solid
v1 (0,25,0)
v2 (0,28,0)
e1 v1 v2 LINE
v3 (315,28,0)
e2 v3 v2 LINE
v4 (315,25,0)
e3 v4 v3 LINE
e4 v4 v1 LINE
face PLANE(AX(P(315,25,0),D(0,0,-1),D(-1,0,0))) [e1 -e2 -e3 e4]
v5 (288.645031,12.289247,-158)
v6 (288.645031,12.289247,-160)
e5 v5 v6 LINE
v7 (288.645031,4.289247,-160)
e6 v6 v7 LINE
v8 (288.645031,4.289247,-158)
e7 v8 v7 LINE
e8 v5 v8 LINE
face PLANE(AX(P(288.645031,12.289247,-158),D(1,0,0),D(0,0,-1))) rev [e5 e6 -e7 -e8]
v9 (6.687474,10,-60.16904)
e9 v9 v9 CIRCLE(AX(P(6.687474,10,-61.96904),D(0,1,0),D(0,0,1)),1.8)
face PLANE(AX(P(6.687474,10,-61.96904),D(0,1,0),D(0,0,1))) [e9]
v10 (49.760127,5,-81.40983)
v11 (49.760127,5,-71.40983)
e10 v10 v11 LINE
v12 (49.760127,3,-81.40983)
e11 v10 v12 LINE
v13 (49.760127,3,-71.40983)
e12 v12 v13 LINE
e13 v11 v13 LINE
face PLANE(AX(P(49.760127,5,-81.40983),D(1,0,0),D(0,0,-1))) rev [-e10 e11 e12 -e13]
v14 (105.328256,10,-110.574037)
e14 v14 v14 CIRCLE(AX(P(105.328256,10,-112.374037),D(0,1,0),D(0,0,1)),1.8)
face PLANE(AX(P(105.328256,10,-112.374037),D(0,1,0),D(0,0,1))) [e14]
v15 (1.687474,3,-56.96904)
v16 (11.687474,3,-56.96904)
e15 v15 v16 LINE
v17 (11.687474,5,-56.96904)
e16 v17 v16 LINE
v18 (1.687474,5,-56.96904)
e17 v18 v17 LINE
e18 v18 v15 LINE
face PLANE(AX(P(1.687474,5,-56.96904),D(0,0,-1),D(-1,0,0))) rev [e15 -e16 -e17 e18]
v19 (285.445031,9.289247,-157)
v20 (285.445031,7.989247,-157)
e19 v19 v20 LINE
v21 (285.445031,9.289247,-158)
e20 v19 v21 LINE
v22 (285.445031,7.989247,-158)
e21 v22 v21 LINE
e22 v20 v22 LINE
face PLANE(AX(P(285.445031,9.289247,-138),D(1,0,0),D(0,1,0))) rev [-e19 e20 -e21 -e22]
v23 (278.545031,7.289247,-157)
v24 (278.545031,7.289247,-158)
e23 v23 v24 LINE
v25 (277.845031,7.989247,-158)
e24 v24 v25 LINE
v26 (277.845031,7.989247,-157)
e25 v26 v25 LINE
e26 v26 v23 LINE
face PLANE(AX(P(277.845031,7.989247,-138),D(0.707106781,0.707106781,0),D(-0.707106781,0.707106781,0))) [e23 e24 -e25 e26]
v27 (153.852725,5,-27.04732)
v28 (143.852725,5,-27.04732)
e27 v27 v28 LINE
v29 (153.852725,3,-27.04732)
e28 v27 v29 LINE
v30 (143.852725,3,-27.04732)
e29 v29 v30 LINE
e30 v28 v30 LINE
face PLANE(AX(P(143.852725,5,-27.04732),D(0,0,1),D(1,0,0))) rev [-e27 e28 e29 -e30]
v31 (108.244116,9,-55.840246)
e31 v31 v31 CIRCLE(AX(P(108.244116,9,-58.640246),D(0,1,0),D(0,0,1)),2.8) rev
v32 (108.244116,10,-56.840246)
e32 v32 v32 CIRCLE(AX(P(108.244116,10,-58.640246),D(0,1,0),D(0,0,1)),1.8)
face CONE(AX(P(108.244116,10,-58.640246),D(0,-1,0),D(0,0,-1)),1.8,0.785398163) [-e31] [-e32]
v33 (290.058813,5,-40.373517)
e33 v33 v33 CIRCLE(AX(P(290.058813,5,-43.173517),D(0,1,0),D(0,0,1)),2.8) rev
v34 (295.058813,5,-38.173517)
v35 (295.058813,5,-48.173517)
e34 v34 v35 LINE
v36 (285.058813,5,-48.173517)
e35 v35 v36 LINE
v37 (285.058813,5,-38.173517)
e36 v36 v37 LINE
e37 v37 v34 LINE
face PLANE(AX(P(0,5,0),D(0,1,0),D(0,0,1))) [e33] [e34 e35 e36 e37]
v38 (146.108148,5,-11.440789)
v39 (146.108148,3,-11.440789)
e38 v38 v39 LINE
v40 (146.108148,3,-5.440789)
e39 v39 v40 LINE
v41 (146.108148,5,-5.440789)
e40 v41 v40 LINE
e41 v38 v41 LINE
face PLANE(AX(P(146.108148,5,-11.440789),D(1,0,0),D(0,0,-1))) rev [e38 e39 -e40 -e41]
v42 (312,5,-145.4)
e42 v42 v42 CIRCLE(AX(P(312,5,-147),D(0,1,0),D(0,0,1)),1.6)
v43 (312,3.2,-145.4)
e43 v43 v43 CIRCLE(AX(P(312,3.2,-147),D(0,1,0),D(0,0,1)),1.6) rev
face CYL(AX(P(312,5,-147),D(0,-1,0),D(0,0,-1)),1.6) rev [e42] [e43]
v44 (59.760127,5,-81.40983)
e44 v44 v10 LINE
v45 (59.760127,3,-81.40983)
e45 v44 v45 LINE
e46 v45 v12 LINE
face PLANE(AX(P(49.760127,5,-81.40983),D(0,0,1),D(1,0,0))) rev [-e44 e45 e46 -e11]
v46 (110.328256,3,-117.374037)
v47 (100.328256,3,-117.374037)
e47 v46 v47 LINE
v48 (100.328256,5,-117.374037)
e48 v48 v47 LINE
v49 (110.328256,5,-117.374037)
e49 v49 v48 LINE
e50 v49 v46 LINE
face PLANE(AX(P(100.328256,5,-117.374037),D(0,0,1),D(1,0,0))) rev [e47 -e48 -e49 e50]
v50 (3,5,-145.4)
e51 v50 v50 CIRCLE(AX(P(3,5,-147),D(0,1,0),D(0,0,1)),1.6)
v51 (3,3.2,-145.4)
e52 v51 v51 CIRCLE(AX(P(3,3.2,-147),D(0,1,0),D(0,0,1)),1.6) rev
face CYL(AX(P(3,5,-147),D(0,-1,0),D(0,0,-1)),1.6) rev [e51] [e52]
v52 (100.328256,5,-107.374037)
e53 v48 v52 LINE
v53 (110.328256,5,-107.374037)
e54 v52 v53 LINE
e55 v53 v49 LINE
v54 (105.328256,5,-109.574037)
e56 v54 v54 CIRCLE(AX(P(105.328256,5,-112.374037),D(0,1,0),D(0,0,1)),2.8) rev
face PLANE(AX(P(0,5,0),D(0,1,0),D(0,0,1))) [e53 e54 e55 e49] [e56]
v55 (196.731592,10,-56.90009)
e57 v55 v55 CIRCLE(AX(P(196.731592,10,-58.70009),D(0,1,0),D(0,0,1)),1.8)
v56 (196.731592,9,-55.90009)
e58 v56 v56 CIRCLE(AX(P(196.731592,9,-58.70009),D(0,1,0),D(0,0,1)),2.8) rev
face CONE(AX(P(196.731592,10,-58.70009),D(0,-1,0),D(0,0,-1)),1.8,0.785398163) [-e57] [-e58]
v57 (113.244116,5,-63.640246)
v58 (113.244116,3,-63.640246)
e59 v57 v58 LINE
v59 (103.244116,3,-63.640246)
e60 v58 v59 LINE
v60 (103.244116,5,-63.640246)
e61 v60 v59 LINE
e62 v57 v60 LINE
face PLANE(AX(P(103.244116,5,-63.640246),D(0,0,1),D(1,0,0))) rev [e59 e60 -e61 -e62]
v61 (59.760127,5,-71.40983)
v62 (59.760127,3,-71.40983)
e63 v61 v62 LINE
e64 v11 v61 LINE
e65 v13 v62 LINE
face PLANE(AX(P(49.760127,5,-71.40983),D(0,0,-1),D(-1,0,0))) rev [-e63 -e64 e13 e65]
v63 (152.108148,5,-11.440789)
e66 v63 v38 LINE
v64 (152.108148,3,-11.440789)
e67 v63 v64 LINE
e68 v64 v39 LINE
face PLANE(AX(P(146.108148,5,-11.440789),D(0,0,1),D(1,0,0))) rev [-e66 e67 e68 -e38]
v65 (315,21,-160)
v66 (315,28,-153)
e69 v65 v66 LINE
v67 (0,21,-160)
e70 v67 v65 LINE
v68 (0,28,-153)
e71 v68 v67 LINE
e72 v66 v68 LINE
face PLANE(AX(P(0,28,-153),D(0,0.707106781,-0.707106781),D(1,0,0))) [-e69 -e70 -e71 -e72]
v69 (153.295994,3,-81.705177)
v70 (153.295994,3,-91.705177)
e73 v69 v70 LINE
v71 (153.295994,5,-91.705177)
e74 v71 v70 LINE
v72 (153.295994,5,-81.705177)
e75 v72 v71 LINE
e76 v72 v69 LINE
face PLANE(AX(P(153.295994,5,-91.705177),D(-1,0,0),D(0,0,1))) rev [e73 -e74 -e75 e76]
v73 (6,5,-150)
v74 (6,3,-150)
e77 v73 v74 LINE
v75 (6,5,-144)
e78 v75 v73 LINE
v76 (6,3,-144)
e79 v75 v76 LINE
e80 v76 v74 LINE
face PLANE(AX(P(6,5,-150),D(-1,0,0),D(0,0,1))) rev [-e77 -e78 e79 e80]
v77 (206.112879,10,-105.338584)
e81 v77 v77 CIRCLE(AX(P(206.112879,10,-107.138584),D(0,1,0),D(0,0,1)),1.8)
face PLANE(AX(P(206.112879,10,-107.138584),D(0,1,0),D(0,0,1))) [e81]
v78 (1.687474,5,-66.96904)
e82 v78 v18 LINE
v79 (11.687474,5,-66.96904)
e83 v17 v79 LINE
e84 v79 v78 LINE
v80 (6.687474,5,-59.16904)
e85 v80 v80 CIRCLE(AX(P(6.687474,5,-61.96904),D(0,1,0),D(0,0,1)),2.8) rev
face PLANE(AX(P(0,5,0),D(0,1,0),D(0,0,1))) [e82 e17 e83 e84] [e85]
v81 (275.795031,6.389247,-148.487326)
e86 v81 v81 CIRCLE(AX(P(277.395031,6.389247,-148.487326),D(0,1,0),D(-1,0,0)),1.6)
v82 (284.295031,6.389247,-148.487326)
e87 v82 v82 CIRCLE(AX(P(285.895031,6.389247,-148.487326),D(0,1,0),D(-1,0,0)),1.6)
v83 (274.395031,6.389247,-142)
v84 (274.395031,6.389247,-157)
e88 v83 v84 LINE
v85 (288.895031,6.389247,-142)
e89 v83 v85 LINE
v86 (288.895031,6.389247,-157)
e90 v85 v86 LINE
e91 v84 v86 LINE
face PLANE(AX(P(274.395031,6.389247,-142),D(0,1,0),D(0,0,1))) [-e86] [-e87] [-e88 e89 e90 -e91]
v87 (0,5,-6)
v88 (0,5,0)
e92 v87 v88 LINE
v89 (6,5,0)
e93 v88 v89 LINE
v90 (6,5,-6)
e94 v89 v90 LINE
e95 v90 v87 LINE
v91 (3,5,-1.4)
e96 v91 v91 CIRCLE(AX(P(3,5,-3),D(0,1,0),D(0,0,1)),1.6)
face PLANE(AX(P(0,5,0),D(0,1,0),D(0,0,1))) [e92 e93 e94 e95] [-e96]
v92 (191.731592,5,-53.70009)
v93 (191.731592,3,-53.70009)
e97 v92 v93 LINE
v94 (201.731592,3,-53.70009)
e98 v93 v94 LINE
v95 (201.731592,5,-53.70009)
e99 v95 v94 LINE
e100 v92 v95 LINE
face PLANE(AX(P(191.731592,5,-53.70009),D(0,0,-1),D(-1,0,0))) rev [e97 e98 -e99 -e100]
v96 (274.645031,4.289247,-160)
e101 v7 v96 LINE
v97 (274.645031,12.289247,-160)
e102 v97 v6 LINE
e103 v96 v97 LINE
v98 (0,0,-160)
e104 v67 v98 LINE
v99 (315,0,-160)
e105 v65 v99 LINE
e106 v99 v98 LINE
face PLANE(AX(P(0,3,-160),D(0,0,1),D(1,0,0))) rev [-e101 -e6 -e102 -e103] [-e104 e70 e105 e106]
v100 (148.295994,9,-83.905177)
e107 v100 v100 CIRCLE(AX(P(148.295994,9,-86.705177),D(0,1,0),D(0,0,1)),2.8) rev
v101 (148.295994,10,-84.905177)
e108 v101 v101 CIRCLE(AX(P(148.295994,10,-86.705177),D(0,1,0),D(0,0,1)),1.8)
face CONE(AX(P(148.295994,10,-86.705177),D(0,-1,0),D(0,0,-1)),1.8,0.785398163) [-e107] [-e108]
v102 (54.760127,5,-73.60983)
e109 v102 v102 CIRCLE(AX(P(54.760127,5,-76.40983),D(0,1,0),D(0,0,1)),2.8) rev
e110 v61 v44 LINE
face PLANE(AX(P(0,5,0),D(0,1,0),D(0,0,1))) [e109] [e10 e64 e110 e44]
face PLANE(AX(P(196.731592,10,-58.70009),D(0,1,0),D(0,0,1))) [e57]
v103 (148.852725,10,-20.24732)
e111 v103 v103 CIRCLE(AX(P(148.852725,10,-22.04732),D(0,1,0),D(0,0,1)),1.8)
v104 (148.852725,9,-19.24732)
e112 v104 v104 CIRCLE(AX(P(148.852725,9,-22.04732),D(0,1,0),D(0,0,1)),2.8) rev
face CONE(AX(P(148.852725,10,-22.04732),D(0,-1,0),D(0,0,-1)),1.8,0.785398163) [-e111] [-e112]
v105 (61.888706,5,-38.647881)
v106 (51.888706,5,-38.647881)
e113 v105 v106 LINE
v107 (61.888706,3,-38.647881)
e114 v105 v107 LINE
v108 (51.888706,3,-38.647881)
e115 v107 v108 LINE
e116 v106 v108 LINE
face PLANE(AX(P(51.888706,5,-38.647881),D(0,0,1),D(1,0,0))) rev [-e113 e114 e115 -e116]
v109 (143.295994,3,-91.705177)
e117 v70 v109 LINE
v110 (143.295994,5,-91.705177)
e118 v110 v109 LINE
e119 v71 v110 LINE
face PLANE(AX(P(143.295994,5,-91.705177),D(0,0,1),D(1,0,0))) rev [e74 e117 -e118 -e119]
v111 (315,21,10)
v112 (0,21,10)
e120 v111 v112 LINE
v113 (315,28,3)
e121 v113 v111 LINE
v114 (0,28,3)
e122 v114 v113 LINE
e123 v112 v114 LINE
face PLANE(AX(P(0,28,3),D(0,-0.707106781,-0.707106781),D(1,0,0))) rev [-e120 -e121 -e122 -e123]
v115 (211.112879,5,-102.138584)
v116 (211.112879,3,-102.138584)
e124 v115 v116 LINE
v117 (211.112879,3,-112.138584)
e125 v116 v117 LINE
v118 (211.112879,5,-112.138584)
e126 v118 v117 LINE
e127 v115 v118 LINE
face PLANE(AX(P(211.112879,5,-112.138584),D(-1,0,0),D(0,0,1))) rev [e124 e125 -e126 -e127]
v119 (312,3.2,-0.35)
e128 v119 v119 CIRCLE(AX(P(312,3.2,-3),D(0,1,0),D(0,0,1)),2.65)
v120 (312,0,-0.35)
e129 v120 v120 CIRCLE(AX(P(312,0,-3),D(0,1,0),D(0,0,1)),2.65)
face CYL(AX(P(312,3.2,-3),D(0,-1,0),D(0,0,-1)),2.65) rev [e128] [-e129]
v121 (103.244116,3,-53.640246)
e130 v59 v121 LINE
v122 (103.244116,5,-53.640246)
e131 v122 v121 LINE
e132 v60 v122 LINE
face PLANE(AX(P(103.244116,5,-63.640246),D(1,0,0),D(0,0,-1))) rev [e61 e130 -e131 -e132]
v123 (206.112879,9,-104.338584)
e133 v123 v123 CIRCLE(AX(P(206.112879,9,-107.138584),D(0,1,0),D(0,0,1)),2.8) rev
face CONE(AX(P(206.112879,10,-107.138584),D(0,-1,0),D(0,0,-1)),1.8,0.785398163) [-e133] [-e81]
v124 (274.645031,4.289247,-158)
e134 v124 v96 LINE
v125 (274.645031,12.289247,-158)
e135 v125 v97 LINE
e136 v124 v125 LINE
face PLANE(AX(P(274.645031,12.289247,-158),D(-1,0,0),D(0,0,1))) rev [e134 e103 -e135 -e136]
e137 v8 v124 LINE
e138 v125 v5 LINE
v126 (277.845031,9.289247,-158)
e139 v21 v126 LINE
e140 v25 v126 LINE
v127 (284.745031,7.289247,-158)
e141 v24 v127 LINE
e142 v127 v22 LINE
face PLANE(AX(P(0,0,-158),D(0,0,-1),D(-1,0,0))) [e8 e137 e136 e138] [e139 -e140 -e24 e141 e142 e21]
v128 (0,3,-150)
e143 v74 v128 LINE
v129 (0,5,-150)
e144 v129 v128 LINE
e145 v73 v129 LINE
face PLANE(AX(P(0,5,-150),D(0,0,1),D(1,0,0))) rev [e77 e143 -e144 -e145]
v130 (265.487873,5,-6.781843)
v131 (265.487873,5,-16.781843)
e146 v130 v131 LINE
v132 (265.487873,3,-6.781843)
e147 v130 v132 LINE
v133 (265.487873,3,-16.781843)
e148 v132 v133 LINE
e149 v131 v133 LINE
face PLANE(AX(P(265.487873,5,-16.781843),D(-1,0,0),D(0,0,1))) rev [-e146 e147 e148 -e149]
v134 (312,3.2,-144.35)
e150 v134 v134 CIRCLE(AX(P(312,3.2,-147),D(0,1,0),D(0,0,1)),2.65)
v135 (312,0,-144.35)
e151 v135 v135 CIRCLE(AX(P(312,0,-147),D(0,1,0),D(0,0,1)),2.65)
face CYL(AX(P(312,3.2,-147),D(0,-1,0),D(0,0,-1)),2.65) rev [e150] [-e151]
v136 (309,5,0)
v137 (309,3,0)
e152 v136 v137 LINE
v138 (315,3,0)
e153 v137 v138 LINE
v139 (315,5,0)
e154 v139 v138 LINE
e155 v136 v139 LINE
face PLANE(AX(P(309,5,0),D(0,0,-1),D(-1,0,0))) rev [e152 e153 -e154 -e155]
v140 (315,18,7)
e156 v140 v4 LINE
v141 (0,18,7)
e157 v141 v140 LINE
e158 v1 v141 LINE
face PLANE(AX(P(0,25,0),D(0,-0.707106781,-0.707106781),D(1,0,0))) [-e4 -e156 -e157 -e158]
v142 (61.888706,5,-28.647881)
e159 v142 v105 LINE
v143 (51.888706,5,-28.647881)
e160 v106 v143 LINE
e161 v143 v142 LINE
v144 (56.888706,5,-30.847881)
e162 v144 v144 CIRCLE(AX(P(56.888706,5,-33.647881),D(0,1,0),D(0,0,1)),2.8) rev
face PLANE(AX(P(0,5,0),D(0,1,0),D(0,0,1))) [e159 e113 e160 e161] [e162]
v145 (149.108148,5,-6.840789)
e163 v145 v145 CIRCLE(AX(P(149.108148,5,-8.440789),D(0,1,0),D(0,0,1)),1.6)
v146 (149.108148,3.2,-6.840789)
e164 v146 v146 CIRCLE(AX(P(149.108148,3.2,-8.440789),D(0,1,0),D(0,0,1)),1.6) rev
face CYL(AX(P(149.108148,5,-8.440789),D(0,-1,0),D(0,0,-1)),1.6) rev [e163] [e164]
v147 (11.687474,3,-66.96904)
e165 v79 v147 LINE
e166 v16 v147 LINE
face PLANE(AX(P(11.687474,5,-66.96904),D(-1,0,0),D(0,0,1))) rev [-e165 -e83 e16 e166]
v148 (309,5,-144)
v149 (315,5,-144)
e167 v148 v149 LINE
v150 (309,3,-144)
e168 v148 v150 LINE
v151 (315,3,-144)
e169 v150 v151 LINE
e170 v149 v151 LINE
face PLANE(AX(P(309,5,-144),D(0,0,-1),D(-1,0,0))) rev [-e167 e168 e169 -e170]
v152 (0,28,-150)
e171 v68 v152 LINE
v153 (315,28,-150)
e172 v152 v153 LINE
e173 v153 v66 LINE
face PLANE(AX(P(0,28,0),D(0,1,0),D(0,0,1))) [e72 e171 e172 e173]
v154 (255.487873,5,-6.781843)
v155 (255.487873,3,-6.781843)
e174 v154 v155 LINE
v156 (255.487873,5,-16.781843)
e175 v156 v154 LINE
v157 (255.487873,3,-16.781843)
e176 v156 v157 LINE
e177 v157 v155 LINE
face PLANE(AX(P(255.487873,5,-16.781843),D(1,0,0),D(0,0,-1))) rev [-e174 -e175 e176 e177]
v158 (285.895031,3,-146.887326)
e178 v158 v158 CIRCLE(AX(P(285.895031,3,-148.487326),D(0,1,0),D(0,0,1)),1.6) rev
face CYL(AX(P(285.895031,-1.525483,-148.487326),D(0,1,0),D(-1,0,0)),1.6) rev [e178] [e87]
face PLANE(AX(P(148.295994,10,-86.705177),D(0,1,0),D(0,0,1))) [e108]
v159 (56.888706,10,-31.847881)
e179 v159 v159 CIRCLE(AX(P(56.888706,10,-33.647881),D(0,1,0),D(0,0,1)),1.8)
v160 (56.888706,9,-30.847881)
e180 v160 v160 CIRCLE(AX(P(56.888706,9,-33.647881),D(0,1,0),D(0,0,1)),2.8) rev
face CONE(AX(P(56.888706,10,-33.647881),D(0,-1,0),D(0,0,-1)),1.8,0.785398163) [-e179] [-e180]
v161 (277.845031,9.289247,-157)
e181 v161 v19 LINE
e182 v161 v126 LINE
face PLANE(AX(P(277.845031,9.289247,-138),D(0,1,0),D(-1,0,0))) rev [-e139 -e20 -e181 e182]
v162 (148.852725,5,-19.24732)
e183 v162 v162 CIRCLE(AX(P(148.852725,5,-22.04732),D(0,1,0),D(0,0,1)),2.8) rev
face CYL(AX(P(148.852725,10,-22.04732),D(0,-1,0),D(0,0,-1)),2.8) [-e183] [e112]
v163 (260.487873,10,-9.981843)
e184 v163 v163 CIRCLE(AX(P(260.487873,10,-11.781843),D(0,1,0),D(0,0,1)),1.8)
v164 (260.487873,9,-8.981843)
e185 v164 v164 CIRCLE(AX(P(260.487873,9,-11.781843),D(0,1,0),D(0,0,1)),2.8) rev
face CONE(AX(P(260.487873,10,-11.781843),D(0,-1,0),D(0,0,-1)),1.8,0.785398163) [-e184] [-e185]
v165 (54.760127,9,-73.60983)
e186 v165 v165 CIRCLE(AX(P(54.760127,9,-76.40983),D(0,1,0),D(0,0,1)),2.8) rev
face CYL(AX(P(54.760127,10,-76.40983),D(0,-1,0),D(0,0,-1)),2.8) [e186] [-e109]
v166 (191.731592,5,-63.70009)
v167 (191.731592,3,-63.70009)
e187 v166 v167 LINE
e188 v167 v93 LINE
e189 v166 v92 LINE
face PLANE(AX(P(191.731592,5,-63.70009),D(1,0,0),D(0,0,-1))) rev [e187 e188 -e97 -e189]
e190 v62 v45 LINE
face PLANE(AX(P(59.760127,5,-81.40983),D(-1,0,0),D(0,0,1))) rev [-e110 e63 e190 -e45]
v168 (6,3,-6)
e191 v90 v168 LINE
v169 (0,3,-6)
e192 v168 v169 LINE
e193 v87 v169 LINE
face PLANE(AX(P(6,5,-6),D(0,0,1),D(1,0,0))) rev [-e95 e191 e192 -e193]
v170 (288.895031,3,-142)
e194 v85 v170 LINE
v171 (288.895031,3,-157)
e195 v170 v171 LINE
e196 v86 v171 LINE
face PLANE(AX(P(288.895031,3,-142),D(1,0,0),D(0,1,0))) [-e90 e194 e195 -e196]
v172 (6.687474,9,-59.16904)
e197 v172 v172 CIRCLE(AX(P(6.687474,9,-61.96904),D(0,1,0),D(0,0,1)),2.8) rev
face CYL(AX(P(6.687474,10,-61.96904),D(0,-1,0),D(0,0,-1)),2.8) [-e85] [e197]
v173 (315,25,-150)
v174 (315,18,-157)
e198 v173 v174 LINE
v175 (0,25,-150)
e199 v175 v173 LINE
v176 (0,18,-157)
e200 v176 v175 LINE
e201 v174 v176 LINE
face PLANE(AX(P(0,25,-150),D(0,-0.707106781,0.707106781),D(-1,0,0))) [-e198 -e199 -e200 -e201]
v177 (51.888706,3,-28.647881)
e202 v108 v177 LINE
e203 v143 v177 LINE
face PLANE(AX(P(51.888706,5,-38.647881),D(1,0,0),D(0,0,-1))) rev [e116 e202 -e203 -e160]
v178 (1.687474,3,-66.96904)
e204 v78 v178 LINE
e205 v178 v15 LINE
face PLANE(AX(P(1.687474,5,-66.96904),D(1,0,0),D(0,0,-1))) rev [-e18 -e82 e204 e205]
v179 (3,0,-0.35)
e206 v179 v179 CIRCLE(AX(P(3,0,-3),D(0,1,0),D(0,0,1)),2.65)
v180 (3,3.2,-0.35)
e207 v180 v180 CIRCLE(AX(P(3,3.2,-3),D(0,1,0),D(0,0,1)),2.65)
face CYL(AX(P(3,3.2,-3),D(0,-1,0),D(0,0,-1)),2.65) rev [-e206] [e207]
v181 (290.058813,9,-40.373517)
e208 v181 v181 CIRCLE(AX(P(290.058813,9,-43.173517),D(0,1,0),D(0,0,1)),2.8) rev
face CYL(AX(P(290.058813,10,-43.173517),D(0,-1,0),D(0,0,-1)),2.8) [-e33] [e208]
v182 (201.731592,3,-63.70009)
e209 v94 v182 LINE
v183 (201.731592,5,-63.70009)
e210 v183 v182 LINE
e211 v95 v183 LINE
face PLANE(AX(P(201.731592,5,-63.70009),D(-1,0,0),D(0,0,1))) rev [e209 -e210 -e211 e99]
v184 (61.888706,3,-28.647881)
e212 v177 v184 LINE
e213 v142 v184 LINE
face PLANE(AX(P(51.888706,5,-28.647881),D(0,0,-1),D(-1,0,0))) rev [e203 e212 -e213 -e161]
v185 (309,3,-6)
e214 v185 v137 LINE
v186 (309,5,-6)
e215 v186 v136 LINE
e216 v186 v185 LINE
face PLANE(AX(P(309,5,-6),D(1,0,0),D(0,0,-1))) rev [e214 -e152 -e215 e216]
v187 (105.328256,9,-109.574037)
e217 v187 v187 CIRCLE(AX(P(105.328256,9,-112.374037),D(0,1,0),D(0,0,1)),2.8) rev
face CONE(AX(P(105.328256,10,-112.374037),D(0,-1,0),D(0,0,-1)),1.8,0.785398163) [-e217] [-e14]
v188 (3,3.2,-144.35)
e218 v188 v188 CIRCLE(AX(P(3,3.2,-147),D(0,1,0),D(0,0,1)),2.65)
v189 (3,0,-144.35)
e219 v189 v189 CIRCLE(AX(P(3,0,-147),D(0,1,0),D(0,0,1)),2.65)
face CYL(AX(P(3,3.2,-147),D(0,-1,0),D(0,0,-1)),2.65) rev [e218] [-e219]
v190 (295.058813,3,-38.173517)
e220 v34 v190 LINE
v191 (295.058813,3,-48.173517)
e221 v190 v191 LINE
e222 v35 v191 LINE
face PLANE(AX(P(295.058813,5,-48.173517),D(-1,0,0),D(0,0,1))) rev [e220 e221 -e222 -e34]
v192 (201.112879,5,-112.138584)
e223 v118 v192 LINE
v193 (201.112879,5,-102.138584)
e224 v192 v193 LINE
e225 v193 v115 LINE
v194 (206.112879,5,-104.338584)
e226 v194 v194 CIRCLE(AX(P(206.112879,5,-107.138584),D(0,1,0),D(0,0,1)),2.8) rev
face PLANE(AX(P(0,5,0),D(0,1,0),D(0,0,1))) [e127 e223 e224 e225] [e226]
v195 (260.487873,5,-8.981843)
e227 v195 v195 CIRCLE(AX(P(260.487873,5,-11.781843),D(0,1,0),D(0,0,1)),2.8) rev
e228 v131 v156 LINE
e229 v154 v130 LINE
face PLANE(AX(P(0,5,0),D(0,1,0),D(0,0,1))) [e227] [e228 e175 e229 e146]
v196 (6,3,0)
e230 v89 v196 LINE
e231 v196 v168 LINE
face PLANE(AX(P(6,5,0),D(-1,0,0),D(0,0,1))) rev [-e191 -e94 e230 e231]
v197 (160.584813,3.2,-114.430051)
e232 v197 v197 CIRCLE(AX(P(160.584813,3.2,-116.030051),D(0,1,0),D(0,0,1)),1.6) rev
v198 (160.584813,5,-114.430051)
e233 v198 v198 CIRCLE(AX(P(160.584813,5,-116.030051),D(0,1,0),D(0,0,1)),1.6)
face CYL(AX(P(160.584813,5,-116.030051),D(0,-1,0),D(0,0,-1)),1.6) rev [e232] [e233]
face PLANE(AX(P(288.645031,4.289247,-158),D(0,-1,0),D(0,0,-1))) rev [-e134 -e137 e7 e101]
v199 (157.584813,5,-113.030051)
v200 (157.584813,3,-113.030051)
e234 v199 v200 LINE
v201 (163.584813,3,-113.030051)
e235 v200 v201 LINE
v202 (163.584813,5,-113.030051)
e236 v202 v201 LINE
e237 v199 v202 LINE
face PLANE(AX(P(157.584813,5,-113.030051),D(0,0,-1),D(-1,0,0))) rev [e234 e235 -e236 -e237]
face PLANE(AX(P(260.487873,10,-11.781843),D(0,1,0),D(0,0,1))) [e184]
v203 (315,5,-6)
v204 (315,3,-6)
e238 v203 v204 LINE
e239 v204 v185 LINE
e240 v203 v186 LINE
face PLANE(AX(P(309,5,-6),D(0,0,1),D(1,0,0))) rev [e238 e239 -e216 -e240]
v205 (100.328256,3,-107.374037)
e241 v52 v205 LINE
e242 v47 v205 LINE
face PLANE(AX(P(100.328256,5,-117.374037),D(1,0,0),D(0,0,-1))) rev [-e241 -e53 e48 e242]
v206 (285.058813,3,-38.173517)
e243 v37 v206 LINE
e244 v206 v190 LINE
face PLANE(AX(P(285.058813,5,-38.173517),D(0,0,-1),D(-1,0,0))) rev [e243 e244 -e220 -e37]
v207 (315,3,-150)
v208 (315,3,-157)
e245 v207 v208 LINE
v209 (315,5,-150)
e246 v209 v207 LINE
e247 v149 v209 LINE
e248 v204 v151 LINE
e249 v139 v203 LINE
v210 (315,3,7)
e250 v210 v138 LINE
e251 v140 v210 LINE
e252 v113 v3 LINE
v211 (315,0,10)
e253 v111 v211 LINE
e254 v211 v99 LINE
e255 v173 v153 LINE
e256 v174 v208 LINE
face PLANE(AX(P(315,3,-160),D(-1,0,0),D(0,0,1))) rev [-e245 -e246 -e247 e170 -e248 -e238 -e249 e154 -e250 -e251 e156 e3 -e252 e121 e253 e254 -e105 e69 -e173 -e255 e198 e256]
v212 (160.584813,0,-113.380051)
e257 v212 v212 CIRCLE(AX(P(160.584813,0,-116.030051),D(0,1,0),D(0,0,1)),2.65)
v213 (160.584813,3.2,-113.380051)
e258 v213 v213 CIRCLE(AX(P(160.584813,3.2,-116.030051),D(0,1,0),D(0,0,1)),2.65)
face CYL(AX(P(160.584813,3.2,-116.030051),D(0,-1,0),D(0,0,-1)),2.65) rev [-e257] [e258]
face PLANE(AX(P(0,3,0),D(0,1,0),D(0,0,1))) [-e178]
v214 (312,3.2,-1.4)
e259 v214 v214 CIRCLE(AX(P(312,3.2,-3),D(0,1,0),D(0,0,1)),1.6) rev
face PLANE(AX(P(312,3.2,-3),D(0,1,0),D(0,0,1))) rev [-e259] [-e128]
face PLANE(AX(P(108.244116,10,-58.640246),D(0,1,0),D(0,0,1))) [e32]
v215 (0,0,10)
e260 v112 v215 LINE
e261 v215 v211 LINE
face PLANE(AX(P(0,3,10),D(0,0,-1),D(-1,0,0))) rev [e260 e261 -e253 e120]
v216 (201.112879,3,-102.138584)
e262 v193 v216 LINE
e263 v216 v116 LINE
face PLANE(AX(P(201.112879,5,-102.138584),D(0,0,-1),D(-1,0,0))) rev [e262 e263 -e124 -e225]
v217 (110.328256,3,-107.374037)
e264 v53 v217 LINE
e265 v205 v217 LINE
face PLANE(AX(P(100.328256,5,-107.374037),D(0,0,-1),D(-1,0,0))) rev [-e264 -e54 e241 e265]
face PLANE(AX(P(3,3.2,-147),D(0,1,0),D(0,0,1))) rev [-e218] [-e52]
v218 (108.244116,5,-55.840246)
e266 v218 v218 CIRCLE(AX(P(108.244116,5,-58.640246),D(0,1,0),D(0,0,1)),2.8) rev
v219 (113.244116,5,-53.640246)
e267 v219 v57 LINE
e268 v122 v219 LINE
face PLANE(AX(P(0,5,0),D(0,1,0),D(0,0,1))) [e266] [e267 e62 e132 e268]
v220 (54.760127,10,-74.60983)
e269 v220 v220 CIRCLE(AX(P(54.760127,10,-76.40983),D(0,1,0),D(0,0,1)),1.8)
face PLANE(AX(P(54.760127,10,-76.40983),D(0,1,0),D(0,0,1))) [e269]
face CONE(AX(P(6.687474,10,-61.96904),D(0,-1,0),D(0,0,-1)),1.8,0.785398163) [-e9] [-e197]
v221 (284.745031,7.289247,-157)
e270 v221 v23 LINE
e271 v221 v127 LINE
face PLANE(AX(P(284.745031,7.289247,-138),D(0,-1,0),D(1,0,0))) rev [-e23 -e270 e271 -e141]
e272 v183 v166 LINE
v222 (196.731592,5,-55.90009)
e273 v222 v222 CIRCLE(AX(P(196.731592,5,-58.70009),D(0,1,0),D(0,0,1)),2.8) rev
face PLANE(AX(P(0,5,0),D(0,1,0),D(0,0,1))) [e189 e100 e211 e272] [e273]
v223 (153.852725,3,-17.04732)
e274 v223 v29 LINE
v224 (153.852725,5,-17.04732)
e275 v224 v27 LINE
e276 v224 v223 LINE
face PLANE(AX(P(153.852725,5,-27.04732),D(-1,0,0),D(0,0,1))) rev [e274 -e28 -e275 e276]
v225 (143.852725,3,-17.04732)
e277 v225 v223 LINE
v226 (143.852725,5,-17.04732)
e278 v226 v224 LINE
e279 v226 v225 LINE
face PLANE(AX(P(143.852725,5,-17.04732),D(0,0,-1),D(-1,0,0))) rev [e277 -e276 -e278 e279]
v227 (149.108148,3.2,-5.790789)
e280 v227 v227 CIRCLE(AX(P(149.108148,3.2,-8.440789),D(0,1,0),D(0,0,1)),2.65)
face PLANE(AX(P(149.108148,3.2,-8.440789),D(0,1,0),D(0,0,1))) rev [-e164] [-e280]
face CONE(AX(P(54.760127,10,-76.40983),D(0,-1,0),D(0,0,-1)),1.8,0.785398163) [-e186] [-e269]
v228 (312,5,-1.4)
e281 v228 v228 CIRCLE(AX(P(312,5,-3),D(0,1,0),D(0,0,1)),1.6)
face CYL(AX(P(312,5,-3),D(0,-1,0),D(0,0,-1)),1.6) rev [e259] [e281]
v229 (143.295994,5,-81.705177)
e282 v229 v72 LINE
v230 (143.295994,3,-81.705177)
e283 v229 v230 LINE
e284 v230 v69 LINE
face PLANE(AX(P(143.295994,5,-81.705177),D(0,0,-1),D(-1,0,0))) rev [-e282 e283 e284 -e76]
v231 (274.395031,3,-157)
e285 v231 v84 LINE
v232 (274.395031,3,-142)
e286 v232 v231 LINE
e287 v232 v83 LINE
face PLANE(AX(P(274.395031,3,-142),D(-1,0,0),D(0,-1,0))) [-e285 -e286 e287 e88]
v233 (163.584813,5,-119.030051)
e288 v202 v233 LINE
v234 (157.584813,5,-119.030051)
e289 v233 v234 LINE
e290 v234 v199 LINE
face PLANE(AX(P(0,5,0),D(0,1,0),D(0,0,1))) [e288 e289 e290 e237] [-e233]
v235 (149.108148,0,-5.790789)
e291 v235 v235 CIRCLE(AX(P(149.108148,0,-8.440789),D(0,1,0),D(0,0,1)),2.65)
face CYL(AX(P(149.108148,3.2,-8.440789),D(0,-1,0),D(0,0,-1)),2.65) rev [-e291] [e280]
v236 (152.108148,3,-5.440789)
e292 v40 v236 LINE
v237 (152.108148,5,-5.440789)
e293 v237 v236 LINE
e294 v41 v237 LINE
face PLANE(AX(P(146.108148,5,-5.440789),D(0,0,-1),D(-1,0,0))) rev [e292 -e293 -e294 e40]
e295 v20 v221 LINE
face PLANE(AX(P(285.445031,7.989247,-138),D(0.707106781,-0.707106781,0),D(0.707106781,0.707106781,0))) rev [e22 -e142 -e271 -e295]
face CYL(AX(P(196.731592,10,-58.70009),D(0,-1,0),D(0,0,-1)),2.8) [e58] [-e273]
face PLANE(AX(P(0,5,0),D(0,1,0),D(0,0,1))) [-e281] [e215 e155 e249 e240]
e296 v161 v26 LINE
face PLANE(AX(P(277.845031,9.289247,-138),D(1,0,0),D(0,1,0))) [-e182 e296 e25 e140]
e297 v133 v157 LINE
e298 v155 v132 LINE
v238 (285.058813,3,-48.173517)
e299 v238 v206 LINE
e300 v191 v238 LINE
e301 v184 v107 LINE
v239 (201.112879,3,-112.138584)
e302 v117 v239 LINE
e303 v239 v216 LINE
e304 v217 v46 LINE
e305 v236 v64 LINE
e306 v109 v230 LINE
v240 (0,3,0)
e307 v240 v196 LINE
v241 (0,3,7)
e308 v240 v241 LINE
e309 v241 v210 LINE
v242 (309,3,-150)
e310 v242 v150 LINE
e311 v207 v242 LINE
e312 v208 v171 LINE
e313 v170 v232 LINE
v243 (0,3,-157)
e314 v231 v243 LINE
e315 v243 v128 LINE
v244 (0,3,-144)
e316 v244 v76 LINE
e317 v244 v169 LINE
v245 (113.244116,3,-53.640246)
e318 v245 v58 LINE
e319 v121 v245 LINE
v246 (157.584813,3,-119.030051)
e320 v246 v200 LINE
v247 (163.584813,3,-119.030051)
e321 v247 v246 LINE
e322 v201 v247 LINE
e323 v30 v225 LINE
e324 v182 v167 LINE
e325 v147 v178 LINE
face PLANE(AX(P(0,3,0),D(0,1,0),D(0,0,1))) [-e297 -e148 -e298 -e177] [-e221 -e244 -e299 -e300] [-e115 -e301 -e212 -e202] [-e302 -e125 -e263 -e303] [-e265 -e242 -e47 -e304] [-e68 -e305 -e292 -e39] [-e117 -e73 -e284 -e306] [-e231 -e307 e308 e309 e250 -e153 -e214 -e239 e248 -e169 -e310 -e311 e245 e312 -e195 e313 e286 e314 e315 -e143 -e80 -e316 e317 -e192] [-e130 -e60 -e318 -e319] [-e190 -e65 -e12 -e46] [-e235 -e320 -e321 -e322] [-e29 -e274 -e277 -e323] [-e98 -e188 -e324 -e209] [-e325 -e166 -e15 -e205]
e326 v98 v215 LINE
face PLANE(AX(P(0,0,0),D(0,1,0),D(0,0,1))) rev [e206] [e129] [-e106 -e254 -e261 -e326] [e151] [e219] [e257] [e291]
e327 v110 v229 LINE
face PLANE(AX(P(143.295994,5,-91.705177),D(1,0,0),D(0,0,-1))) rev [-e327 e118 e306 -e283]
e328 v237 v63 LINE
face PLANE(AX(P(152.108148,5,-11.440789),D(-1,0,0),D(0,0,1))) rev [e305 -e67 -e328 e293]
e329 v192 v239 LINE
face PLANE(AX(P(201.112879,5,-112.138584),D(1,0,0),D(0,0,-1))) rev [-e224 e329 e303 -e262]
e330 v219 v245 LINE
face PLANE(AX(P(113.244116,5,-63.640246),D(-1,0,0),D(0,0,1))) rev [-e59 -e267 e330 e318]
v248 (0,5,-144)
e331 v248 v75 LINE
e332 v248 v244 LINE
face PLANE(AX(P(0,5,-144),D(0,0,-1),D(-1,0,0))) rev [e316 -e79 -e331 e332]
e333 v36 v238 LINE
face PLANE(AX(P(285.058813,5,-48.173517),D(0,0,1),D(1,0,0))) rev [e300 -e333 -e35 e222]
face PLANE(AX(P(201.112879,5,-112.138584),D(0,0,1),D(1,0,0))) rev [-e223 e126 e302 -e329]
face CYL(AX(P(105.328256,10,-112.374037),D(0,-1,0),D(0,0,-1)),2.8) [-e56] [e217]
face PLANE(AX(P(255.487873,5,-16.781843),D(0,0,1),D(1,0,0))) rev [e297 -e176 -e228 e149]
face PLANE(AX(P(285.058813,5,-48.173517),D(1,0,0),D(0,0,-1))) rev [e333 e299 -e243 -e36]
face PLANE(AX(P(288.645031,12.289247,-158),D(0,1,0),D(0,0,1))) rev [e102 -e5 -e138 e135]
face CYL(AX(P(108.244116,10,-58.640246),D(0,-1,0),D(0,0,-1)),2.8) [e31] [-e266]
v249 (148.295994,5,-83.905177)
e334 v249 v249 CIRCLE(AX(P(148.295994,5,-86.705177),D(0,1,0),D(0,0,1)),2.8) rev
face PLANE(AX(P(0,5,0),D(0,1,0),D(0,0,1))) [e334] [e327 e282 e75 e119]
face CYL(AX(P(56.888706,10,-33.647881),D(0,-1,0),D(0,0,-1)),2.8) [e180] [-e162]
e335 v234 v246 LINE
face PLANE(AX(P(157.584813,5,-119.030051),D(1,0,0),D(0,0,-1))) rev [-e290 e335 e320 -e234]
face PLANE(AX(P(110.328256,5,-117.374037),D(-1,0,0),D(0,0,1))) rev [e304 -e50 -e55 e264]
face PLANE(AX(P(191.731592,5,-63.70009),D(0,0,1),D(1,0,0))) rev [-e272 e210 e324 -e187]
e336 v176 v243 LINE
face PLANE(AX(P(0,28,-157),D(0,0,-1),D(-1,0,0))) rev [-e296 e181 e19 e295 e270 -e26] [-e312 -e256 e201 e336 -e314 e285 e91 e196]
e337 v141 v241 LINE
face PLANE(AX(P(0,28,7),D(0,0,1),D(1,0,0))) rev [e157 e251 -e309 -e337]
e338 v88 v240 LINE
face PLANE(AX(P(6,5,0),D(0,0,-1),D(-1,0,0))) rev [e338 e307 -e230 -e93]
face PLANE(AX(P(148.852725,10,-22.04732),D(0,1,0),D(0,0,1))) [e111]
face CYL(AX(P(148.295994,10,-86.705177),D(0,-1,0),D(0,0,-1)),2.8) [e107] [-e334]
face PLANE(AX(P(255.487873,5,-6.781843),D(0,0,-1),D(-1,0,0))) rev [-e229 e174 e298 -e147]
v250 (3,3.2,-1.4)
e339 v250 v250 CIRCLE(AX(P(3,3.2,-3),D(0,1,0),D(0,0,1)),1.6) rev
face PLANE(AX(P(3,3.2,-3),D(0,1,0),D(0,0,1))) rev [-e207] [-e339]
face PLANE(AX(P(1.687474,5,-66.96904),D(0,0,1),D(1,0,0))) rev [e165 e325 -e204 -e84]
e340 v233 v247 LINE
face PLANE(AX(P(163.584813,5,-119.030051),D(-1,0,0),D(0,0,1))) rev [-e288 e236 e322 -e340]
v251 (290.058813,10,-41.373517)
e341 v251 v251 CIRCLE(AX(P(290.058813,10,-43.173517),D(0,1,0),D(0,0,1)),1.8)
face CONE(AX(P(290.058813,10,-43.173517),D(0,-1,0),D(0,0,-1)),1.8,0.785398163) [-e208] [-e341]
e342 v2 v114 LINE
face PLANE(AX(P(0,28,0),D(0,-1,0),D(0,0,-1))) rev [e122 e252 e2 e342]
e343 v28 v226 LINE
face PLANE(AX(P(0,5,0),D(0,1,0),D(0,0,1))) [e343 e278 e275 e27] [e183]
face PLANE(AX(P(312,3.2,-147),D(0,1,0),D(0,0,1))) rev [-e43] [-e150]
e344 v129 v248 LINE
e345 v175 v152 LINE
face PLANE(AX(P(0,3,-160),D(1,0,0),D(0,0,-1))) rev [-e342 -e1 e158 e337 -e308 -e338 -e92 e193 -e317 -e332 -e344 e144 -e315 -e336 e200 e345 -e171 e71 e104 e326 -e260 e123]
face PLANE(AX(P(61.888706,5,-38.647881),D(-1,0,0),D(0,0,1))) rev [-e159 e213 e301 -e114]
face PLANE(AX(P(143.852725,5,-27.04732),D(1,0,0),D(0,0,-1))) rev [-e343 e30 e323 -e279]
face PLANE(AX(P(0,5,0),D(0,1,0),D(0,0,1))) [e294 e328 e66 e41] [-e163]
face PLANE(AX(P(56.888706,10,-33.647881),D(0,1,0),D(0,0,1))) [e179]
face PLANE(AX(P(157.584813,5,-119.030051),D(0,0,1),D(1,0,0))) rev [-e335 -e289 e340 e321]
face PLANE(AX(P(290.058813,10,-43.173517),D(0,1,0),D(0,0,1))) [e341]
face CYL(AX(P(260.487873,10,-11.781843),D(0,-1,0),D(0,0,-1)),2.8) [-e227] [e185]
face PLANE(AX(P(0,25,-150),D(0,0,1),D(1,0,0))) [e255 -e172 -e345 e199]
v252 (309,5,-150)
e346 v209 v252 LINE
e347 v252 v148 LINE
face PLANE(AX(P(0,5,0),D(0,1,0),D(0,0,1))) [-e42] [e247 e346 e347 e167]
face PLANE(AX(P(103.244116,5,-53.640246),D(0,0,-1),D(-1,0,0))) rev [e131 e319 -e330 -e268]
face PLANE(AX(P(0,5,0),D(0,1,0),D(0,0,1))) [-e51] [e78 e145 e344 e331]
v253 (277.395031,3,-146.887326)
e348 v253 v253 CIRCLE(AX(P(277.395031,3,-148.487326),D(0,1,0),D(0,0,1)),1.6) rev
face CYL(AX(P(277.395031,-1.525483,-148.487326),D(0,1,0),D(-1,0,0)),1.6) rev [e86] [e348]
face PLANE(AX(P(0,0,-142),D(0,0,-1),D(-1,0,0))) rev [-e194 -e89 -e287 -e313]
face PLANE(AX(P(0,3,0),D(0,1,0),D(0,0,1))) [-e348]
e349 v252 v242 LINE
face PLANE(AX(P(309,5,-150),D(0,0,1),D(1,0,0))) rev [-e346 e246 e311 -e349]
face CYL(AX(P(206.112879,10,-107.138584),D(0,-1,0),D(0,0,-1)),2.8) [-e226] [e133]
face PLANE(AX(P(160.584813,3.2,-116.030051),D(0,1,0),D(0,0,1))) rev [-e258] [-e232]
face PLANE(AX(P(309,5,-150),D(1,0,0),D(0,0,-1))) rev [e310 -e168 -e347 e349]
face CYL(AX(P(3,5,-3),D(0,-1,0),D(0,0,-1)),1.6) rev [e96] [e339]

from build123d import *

# Parameters (mm, degrees)
SKETCH3_W           = 315
SKETCH3_H           = 170
BOSS_EXTRUDE1_DEPTH = 3
SKETCH5_W           = 6
SKETCH5_H           = 6
SKETCH5_W_2         = 10
SKETCH5_H_2         = 10
SKETCH5_W_3         = 10.000000001
BOSS_EXTRUDE2_DEPTH = 2
SKETCH6_R           = 2.65
CUT_EXTRUDE1_DEPTH  = 3.2
SKETCH7_R           = 1.6
CUT_EXTRUDE2_DEPTH  = 354.341194881
SKETCH8_R           = 2.8
BOSS_EXTRUDE3_DEPTH = 10
CHAMFER1_SIZE       = 1
SKETCH9_W           = 315
SKETCH9_H           = 3
BOSS_EXTRUDE4_DEPTH = 28
SKETCH10_W          = 315
SKETCH10_H          = 10
BOSS_EXTRUDE5_DEPTH = 3
CHAMFER2_SIZE       = 7
CUT_EXTRUDE3_DEPTH  = 22
SKETCH12_W          = 14.5
SKETCH12_H          = 3.389246664
BOSS_EXTRUDE6_DEPTH = 18
SKETCH13_R          = 1.6
CUT_EXTRUDE4_DEPTH  = 3.389246664
SKETCH14_W          = 14
SKETCH14_H          = 8
CUT_EXTRUDE5_DEPTH  = 2


with BuildPart() as part:
    # Sketch3 → Boss-Extrude1 (new body)
    with BuildSketch(Plane(origin=(0, 0, 0), x_dir=(1, 0, 0), z_dir=(0, 1, 0))):
        with Locations((157.5, 75)):
            Rectangle(SKETCH3_W, SKETCH3_H)
    extrude(amount=BOSS_EXTRUDE1_DEPTH)

    # Sketch5 → Boss-Extrude2 (add)
    with BuildSketch(Plane(origin=(0, 3, 0), x_dir=(1, 0, 0), z_dir=(0, 1, 0))):
        with Locations((3, 147)):
            Rectangle(SKETCH5_W, SKETCH5_H)
        with Locations((3, 3)):
            Rectangle(SKETCH5_W, SKETCH5_H)
        with Locations((6.687473524, 61.969040414)):
            Rectangle(SKETCH5_W_2, SKETCH5_H_2)
        with Locations((54.760126517, 76.409830141)):
            Rectangle(SKETCH5_W_3, SKETCH5_H_2)
        with Locations((56.888706053, 33.647880775)):
            Rectangle(SKETCH5_W_2, SKETCH5_H_2)
        with Locations((105.328256476, 112.374037416)):
            Rectangle(SKETCH5_W_2, SKETCH5_H_2)
        with Locations((108.244116471, 58.640246108)):
            Rectangle(SKETCH5_W_2, SKETCH5_H_2)
        with Locations((148.295993654, 86.70517668)):
            Rectangle(SKETCH5_W_2, SKETCH5_H_2)
        with Locations((148.852724672, 22.047319758)):
            Rectangle(SKETCH5_W_2, SKETCH5_H_2)
        with Locations((149.108148483, 8.440789408)):
            Rectangle(SKETCH5_W, SKETCH5_H)
        with Locations((196.731592235, 58.70008969)):
            Rectangle(SKETCH5_W_2, SKETCH5_H_2)
        with Locations((206.112878642, 107.13858398)):
            Rectangle(SKETCH5_W_2, SKETCH5_H_2)
        with Locations((160.584813344, 116.030051039)):
            Rectangle(SKETCH5_W, SKETCH5_H)
        with Locations((260.487872979, 11.781843085)):
            Rectangle(SKETCH5_W_2, SKETCH5_H_2)
        with Locations((290.058812632, 43.173516523)):
            Rectangle(SKETCH5_W_3, SKETCH5_H_2)
        with Locations((312, 147)):
            Rectangle(SKETCH5_W, SKETCH5_H)
        with Locations((312, 3)):
            Rectangle(SKETCH5_W, SKETCH5_H)
    extrude(amount=BOSS_EXTRUDE2_DEPTH)

    # Sketch6 → Cut-Extrude1 (cut)
    with BuildSketch(Plane(origin=(0, 0, 0), x_dir=(1, 0, 0), z_dir=(0, 1, 0))):
        with Locations(Location((3, 147, 0), (0, 0, 270))):
            Circle(SKETCH6_R)
        with Locations(Location((3, 3, 0), (0, 0, 270))):
            Circle(SKETCH6_R)
        with Locations(Location((149.108148483, 8.440789408, 0), (0, 0, 270))):
            Circle(SKETCH6_R)
        with Locations(Location((160.584813344, 116.030051039, 0), (0, 0, 270))):
            Circle(SKETCH6_R)
        with Locations(Location((312, 3, 0), (0, 0, 270))):
            Circle(SKETCH6_R)
        with Locations(Location((312, 147, 0), (0, 0, 270))):
            Circle(SKETCH6_R)
    extrude(amount=CUT_EXTRUDE1_DEPTH, mode=Mode.SUBTRACT)

    # Sketch7 → Cut-Extrude2 (cut, through all)
    with BuildSketch(Plane(origin=(0, 0, 0), x_dir=(1, 0, 0), z_dir=(0, 1, 0))):
        with Locations(Location((3, 147, 0), (0, 0, 270))):
            Circle(SKETCH7_R)
        with Locations(Location((312, 147, 0), (0, 0, 270))):
            Circle(SKETCH7_R)
        with Locations(Location((312, 3, 0), (0, 0, 270))):
            Circle(SKETCH7_R)
        with Locations(Location((149.108148483, 8.440789408, 0), (0, 0, 270))):
            Circle(SKETCH7_R)
        with Locations(Location((160.584813344, 116.030051039, 0), (0, 0, 270))):
            Circle(SKETCH7_R)
        with Locations(Location((3, 3, 0), (0, 0, 270))):
            Circle(SKETCH7_R)
    extrude(amount=CUT_EXTRUDE2_DEPTH, mode=Mode.SUBTRACT)

    # Sketch8 → Boss-Extrude3 (add)
    with BuildSketch(Plane(origin=(0, 0, 0), x_dir=(1, 0, 0), z_dir=(0, 1, 0))):
        with Locations(Location((6.687473524, 61.969040414, 0), (0, 0, 270))):
            Circle(SKETCH8_R)
        with Locations(Location((54.760126516, 76.409830141, 0), (0, 0, 270))):
            Circle(SKETCH8_R)
        with Locations(Location((56.888706053, 33.647880775, 0), (0, 0, 270))):
            Circle(SKETCH8_R)
        with Locations(Location((108.244116471, 58.640246108, 0), (0, 0, 270))):
            Circle(SKETCH8_R)
        with Locations(Location((105.328256476, 112.374037416, 0), (0, 0, 270))):
            Circle(SKETCH8_R)
        with Locations(Location((148.295993654, 86.70517668, 0), (0, 0, 270))):
            Circle(SKETCH8_R)
        with Locations(Location((206.112878642, 107.13858398, 0), (0, 0, 270))):
            Circle(SKETCH8_R)
        with Locations(Location((196.731592235, 58.70008969, 0), (0, 0, 270))):
            Circle(SKETCH8_R)
        with Locations(Location((148.852724672, 22.047319758, 0), (0, 0, 270))):
            Circle(SKETCH8_R)
        with Locations(Location((260.487872979, 11.781843085, 0), (0, 0, 270))):
            Circle(SKETCH8_R)
        with Locations(Location((290.058812632, 43.173516523, 0), (0, 0, 270))):
            Circle(SKETCH8_R)
    extrude(amount=BOSS_EXTRUDE3_DEPTH)

    # Chamfer1
    chamfer1_edges = [part.edges().sort_by_distance(p)[0] for p in [
        (6.687473524, 10, -64.769040414),
        (54.760126516, 10, -79.209830141),
        (56.888706053, 10, -36.447880775),
        (108.244116471, 10, -61.440246108),
        (105.328256476, 10, -115.174037416),
        (148.295993654, 10, -89.50517668),
        (206.112878642, 10, -109.93858398),
        (196.731592235, 10, -61.50008969),
        (148.852724672, 10, -24.847319758),
        (260.487872979, 10, -14.581843085),
        (290.058812632, 10, -45.973516523),
    ]]
    chamfer(chamfer1_edges, length=CHAMFER1_SIZE)

    # Sketch9 → Boss-Extrude4 (add)
    with BuildSketch(Plane(origin=(0, 0, 0), x_dir=(1, 0, 0), z_dir=(0, 1, 0))):
        with Locations((157.5, 158.5)):
            Rectangle(SKETCH9_W, SKETCH9_H)
        with Locations((157.5, -8.5)):
            Rectangle(SKETCH9_W, SKETCH9_H)
    extrude(amount=BOSS_EXTRUDE4_DEPTH)

    # Sketch10 → Boss-Extrude5 (add)
    with BuildSketch(Plane(origin=(0, 28, 0), x_dir=(1, 0, 0), z_dir=(0, 1, 0))):
        with Locations((157.5, 155)):
            Rectangle(SKETCH10_W, SKETCH10_H)
        with Locations((157.5, -5)):
            Rectangle(SKETCH10_W, SKETCH10_H)
    extrude(amount=-BOSS_EXTRUDE5_DEPTH)

    # Chamfer2
    chamfer2_edges = [part.edges().sort_by_distance(p)[0] for p in [
        (157.5, 25, 7),
        (157.5, 25, -157),
    ]]
    chamfer(chamfer2_edges, length=CHAMFER2_SIZE - 0.0001)  # a hair under: the kernel refuses the full size
    chamfer2_2_edges = [part.edges().sort_by_distance(p)[0] for p in [
        (157.5, 28, 10),
        (157.5, 28, -160),
    ]]
    chamfer(chamfer2_2_edges, length=CHAMFER2_SIZE)

    # Sketch11 → Cut-Extrude3 (cut)
    with BuildSketch(Plane(origin=(0, 0, -160), x_dir=(-1, 0, 0), z_dir=(0, 0, -1))):
        Polygon((-277.845030897, 9.289246664), (-285.445030897, 9.289246664), (-285.445030897, 7.989246664), (-284.745030897, 7.289246664), (-278.545030897, 7.289246664), (-277.845030897, 7.989246664), align=None)
    extrude(amount=-CUT_EXTRUDE3_DEPTH, mode=Mode.SUBTRACT)

    # Sketch12 → Boss-Extrude6 (add)
    with BuildSketch(Plane(origin=(0, 0, -160), x_dir=(-1, 0, 0), z_dir=(0, 0, -1))):
        with Locations((-281.645030897, 4.694623332)):
            Rectangle(SKETCH12_W, SKETCH12_H)
    extrude(amount=-BOSS_EXTRUDE6_DEPTH)

    # Sketch13 → Cut-Extrude4 (cut)
    with BuildSketch(Plane(origin=(0, 6.389246664, 0), x_dir=(1, 0, 0), z_dir=(0, 1, 0))):
        with Locations(Location((277.395030897, 148.487326261, 0), (0, 0, 180))):
            Circle(SKETCH13_R)
        with Locations(Location((285.895030897, 148.487326261, 0), (0, 0, 180))):
            Circle(SKETCH13_R)
    extrude(amount=-CUT_EXTRUDE4_DEPTH, mode=Mode.SUBTRACT)

    # Sketch14 → Cut-Extrude5 (cut)
    with BuildSketch(Plane(origin=(0, 0, -160), x_dir=(-1, 0, 0), z_dir=(0, 0, -1))):
        with Locations((-281.645030897, 8.289246664)):
            Rectangle(SKETCH14_W, SKETCH14_H)
    extrude(amount=-CUT_EXTRUDE5_DEPTH, mode=Mode.SUBTRACT)


solid = part.part
